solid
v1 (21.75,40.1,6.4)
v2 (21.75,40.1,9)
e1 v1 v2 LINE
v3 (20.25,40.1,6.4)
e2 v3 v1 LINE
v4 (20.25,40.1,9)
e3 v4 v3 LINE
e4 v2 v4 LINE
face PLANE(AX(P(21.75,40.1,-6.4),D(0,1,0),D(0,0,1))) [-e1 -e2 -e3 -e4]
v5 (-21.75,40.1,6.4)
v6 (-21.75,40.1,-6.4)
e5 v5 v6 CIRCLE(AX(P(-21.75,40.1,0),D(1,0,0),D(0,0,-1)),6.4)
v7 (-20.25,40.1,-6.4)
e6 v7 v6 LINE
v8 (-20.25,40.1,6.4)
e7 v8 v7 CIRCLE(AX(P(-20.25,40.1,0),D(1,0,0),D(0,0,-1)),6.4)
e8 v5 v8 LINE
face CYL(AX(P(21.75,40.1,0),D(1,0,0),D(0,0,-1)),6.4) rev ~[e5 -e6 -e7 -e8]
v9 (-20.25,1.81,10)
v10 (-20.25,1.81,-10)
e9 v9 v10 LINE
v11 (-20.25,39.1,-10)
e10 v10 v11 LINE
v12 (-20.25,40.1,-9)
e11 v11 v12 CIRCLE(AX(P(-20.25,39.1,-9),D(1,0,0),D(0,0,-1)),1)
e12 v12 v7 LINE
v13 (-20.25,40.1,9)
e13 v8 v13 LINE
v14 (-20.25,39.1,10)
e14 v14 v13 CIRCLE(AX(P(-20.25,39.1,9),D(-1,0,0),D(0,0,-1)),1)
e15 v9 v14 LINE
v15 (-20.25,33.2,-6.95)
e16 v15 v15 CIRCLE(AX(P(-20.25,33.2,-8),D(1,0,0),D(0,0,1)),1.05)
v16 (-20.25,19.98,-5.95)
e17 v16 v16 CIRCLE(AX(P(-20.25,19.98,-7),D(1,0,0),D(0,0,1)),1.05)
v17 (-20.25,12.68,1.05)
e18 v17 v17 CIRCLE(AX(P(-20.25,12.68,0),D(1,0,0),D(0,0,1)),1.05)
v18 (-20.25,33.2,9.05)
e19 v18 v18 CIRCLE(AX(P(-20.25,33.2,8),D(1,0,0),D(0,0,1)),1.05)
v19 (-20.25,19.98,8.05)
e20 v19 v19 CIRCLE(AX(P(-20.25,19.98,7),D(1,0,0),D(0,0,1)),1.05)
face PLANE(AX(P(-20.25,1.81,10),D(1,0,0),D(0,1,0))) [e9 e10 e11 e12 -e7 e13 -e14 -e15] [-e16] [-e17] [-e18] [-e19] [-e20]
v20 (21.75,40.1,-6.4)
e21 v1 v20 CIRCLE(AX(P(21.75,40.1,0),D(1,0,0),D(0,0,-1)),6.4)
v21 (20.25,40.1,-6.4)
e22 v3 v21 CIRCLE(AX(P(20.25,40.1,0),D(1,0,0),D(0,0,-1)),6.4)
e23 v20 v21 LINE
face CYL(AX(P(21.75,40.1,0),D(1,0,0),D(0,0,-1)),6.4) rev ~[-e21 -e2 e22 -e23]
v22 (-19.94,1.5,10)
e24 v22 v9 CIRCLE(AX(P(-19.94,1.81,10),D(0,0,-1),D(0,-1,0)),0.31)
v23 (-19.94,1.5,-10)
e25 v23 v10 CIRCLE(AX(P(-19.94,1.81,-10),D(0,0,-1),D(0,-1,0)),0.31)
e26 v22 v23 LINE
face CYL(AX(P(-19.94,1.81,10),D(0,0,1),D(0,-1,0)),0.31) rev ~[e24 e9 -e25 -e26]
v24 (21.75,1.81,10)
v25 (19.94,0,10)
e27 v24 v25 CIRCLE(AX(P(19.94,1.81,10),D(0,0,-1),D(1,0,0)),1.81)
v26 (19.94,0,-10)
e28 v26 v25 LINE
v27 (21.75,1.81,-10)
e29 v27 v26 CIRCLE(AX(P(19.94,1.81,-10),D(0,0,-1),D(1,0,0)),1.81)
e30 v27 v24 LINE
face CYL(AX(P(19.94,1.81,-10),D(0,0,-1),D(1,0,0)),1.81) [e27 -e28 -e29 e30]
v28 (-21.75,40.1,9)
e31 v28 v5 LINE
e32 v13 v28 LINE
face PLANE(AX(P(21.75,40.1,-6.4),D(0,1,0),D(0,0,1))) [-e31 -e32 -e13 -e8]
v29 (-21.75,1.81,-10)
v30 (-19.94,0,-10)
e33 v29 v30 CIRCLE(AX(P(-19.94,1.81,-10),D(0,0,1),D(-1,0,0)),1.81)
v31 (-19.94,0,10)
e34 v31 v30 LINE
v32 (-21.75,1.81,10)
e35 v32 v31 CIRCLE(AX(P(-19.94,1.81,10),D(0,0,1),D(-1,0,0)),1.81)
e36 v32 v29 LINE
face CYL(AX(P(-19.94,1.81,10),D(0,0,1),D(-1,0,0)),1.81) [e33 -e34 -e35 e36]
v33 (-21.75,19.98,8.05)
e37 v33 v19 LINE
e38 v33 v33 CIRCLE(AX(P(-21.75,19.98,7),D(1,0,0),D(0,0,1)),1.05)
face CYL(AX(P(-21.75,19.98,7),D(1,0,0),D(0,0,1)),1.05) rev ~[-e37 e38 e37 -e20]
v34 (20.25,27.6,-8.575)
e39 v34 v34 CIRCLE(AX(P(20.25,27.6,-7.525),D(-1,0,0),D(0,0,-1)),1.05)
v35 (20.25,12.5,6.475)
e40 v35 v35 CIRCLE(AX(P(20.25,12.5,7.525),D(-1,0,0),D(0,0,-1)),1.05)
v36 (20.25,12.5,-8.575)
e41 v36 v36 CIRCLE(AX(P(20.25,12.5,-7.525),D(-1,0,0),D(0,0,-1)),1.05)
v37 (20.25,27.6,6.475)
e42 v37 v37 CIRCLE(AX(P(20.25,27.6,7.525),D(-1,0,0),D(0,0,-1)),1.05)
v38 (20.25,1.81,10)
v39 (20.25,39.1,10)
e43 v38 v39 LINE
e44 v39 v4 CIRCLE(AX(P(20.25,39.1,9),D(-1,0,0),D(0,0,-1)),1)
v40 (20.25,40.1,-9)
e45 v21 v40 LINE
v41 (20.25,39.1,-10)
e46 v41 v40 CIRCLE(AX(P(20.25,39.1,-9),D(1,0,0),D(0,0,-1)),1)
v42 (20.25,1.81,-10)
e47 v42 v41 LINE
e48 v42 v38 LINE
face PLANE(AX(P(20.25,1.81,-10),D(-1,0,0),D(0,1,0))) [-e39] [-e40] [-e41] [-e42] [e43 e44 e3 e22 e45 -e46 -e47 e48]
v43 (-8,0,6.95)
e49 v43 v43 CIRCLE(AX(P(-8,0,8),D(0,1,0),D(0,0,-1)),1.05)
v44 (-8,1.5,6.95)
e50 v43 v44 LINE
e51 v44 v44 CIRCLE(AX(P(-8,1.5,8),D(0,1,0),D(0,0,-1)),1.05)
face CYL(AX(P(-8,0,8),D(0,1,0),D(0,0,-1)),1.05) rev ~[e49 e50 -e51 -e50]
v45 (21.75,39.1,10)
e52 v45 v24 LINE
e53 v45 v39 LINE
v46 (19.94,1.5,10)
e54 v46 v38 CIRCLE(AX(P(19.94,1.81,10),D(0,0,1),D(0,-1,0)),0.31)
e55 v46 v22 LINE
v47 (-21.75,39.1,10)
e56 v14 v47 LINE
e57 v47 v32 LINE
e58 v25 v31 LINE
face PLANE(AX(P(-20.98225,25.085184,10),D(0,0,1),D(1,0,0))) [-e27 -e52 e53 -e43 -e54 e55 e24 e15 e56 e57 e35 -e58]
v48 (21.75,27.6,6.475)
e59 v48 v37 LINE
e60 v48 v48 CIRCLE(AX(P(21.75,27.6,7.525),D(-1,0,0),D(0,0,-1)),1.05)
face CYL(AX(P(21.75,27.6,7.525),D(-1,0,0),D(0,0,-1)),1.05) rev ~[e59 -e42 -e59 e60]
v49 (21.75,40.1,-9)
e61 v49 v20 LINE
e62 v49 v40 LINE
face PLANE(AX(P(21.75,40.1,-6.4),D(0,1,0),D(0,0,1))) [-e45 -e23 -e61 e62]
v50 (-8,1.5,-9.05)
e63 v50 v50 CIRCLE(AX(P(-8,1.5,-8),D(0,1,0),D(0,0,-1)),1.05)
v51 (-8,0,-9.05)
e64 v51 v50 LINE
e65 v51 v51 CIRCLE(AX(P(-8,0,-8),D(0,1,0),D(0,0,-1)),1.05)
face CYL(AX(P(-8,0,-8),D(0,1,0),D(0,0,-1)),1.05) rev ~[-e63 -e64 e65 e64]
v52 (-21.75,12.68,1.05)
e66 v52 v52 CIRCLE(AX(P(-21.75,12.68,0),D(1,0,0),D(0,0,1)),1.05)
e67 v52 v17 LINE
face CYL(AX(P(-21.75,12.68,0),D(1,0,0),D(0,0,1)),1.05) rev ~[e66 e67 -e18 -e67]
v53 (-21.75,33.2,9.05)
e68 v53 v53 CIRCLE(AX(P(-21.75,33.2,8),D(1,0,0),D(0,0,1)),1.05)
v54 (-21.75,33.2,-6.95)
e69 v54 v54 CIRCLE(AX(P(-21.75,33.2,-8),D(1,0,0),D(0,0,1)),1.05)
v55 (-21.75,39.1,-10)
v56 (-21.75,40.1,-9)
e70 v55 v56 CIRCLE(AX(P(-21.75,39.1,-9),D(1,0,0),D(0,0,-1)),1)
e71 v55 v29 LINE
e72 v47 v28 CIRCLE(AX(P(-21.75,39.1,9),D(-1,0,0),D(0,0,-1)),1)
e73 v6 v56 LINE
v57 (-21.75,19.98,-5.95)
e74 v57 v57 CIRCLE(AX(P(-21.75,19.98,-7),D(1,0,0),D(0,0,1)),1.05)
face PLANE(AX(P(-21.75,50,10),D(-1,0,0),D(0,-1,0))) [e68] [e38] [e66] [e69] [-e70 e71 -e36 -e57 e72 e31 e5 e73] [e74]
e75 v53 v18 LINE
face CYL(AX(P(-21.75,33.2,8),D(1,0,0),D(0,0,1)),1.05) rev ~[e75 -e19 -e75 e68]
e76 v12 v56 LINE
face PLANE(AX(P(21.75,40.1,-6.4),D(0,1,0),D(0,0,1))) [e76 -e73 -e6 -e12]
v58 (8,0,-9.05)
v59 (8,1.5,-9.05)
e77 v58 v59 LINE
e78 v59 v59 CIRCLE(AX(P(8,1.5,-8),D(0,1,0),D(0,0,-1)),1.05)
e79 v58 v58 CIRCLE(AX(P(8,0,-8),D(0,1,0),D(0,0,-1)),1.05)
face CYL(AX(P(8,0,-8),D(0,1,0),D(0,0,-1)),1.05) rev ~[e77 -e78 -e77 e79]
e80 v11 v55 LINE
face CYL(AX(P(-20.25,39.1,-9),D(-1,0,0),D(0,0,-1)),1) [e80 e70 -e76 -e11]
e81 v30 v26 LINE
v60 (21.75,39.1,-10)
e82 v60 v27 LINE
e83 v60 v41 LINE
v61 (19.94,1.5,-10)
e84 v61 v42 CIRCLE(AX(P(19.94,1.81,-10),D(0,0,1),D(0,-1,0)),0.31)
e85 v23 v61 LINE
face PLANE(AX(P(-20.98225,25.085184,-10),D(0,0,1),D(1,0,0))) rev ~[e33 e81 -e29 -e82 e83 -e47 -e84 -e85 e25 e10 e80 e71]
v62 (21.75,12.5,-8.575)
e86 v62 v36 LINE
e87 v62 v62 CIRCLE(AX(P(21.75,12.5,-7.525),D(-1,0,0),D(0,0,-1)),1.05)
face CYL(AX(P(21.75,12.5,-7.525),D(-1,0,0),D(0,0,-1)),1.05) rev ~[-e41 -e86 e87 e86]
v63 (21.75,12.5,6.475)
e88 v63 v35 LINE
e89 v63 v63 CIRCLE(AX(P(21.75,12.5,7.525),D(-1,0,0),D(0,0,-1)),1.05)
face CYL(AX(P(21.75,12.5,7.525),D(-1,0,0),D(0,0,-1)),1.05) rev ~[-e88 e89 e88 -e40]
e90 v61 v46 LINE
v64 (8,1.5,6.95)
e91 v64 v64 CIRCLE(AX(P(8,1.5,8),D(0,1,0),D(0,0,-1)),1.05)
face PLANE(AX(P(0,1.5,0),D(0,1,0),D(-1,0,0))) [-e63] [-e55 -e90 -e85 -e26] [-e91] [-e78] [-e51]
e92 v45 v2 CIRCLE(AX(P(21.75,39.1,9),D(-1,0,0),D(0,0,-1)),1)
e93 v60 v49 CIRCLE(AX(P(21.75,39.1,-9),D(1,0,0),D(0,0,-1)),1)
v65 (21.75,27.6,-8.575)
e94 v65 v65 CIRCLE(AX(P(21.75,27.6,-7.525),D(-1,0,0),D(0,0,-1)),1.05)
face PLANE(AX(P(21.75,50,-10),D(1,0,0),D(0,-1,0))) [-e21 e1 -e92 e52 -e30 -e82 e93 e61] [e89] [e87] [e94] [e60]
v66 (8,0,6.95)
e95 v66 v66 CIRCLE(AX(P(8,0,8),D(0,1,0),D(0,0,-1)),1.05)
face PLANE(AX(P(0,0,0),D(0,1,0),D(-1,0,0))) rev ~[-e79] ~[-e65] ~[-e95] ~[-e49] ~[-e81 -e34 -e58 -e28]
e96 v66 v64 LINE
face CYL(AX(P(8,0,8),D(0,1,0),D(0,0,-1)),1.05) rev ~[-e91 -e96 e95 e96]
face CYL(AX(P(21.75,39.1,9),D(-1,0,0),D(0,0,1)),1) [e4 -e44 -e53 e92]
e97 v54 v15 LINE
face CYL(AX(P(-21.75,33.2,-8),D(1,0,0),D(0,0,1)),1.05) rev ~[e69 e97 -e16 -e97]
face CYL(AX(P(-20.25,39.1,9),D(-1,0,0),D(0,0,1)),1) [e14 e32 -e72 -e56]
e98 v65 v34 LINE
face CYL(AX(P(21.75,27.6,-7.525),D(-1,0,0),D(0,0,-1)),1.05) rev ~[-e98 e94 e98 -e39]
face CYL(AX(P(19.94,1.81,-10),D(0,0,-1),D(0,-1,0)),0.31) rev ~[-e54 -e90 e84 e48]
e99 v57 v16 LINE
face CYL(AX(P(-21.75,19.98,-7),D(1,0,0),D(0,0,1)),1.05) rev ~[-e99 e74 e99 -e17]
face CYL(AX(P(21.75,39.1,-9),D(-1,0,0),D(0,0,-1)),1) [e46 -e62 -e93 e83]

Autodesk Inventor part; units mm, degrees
ref_plane "YZ Plane" through (0, 0, 0) normal (1, 0, 0) x (0, 1, 0)
ref_plane "XZ Plane" through (0, 0, 0) normal (0, 1, 0) x (-1, 0, 0)
ref_plane "XY Plane" through (0, 0, 0) normal (0, 0, 1) x (1, 0, 0)
sketch "Sketch1" plane through (0, 0, 0) normal (0, 1, 0) x (-1, 0, 0)
  line L0 (20.25, -10) -> (-20.25, -10)
  line L1 (-20.25, -10) -> (-20.25, 10)
  line L2 (-20.25, 10) -> (20.25, 10)
  line L3 (20.25, 10) -> (20.25, -10)
  point P0 (0, 0)
  dimension "d0" = 40.5
  dimension "d1" = 20
  dimension "d2" = 10
  dimension "d3" = 20.25
extrude "Plate1" add sketch "Sketch1" along normal blind 1.5
sketch "Sketch2" plane through (21.75, 0, -10) normal (-1, 0, 0) x (0, -1, 0)
  line L0 (0, 20) -> (0, 0)
  line L1 (0, 0) -> (-50, 0)
  line L2 (-50, 0) -> (-50, 20)
  line L3 (-50, 20) -> (0, 20)
edge flange "Flange1" height 50 angle 90 thickness 1.5 bend radius 0.31 thickness toward (-1, 0, 0) relief tear relief width 1.5 relief depth 0.75 edges at (20.25, 1.5, 0) wall of the first edge with corners at (21.75, 0, 10) (21.75, 0, -10) (21.75, 50, -10) (21.75, 50, 10)
bend "Bend1"
corner "Corner1"
sketch "Sketch3" plane through (-21.75, 0, 10) normal (1, 0, 0) x (0, 1, 0)
  line L0 (0, -20) -> (0, 0)
  line L1 (0, 0) -> (50, 0)
  line L2 (50, 0) -> (50, -20)
  line L3 (50, -20) -> (0, -20)
edge flange "Flange2" height 50 angle 90 thickness 1.5 bend radius 0.31 thickness toward (1, 0, 0) relief tear relief width 1.5 relief depth 0.75 edges at (-20.25, 1.5, 0) wall of the first edge with corners at (-21.75, 0, -10) (-21.75, 0, 10) (-21.75, 50, 10) (-21.75, 50, -10)
bend "Bend2"
corner "Corner2"
sketch "Sketch4" plane through (21.75, 50, 10) normal (1, 0, 0) x (0, 0, -1)
  circle A0 centre (10, -9.9) radius 6.4
  line L0 (0, 0) -> (20, 0) projected
  line L1 (20, 0) -> (20, -48.19) projected
  point P0 (10, -50)
  dimension "d25" = 9.9
  dimension "d26" = 12.8
  dimension "d27" = 10
extrude "Extrusion1" cut sketch "Sketch4" against normal blind 50
sketch "Sketch5" plane through (21.75, 50, 10) normal (1, 0, 0) x (0, 0, -1)
  circle A0 centre (10, -9.9) radius 6.4 projected
  line L0 (0, 0) -> (20, 0) projected
  line L1 (-4, 0) -> (24, 0)
  line L2 (24, 0) -> (24, -9.9)
  line L3 (24, -9.9) -> (-4, -9.9)
  line L4 (-4, -9.9) -> (-4, 0)
  line L5 (0, -48.19) -> (0, 0) projected
  point P0 (10, -50)
  dimension "d30" = 9.9
  dimension "d31" = 28
  dimension "d32" = 4
extrude "Extrusion2" cut sketch "Sketch5" against normal blind 50 contours L3 A0 | A0 L3 L5 L0 L1 L2 | L3 L4 L1 L5 picked at (9.2435, -7.9053)
fillet "Fillet1" radius 1 4 edges at (-21, 40.1, 10) (-21, 40.1, -10) (21, 40.1, -10) (21, 40.1, 10)
sketch "Sketch6" plane through (-21.75, 1.81, -10) normal (-1, 0, 0) x (0, 0, 1)
  circle A0 centre (18, 31.39) radius 0.7835 projected
  circle A1 centre (2, 31.39) radius 0.7835 projected
  circle A2 centre (3, 18.17) radius 0.7835 projected
  circle A3 centre (17, 18.17) radius 0.7835 projected
  circle A4 centre (10, 10.87) radius 0.7835 projected
  point P0 (10, -1.81)
hole "Hole1" at (-21.75, 33.2, -8) at (-21.75, 19.98, -7) at (-21.75, 12.68, 0) at (-21.75, 33.2, 8) at (-21.75, 19.98, 7) direction (1, 0, 0) diameter 2.1 depth 1.5
sketch "Sketch7" plane through (21.75, 1.81, 10) normal (1, 0, 0) x (0, 0, -1)
  circle A0 centre (17.525, 25.79) radius 0.7835 projected
  circle A1 centre (2.475, 25.79) radius 0.7835 projected
  circle A2 centre (17.525, 10.69) radius 0.7835 projected
  circle A3 centre (2.475, 10.69) radius 0.7835 projected
  point P0 (10, -1.81)
hole "Hole2" at (21.75, 27.6, 7.525) at (21.75, 27.6, -7.525) at (21.75, 12.5, -7.525) at (21.75, 12.5, 7.525) direction (-1, 0, 0) diameter 2.1 depth 1.5
sketch "Sketch8" plane through (0, 0, 0) normal (0, -1, 0) x (1, 0, 0)
  circle A0 centre (8, -8) radius 1.05 projected
  circle A1 centre (-8, -8) radius 1.05 projected
  circle A2 centre (8, 8) radius 1.05 projected
  circle A3 centre (-8, 8) radius 1.05 projected
  point P0 (0, 0)
hole "Hole3" at (8, 0, -8) at (-8, 0, -8) at (-8, 0, 8) at (8, 0, 8) direction (0, 1, 0) diameter 2.1 depth 1.5
equation "\"d41\" = Thickness"
equation "\"d48\" = Thickness"
equation "\"d55\" = Thickness"
equation "\"d4\" = Thickness"
equation "\"d5\" = BendReliefWidth"
equation "\"d6\" = BendReliefDepth"
equation "\"d7\" = MinimumRemnant"
equation "\"d8\" = TransitionRadius"
equation "\"d11\" = BendRadius"
equation "\"d12\" = CornerReliefSize"
equation "\"d13\" = GapSize"
equation "\"d14\" = JacobiRadiusSize"
equation "\"d15\" = BendReliefWidth"
equation "\"d16\" = BendReliefDepth"
equation "\"d17\" = MinimumRemnant"
equation "\"d18\" = TransitionRadius"
equation "\"d21\" = BendRadius"
equation "\"d22\" = CornerReliefSize"
equation "\"d23\" = GapSize"
equation "\"d24\" = JacobiRadiusSize"
equation "\"BendReliefWidth\" = Thickness"
equation "\"BendReliefDepth\" = 0.5 * Thickness"
equation "\"CornerReliefSize\" = 4 * Thickness"
equation "\"MinimumRemnant\" = 2 * Thickness"
equation "\"TransitionRadius\" = BendRadius"
equation "\"JacobiRadiusSize\" = BendRadius"
equation "\"GapSize\" = Thickness"
equation "\"Thickness\" = 1.5"
equation "\"BendRadius\" = 0.31"
properties part number "axis_10_top_frame" material "Aluminum 6061-AHC"
